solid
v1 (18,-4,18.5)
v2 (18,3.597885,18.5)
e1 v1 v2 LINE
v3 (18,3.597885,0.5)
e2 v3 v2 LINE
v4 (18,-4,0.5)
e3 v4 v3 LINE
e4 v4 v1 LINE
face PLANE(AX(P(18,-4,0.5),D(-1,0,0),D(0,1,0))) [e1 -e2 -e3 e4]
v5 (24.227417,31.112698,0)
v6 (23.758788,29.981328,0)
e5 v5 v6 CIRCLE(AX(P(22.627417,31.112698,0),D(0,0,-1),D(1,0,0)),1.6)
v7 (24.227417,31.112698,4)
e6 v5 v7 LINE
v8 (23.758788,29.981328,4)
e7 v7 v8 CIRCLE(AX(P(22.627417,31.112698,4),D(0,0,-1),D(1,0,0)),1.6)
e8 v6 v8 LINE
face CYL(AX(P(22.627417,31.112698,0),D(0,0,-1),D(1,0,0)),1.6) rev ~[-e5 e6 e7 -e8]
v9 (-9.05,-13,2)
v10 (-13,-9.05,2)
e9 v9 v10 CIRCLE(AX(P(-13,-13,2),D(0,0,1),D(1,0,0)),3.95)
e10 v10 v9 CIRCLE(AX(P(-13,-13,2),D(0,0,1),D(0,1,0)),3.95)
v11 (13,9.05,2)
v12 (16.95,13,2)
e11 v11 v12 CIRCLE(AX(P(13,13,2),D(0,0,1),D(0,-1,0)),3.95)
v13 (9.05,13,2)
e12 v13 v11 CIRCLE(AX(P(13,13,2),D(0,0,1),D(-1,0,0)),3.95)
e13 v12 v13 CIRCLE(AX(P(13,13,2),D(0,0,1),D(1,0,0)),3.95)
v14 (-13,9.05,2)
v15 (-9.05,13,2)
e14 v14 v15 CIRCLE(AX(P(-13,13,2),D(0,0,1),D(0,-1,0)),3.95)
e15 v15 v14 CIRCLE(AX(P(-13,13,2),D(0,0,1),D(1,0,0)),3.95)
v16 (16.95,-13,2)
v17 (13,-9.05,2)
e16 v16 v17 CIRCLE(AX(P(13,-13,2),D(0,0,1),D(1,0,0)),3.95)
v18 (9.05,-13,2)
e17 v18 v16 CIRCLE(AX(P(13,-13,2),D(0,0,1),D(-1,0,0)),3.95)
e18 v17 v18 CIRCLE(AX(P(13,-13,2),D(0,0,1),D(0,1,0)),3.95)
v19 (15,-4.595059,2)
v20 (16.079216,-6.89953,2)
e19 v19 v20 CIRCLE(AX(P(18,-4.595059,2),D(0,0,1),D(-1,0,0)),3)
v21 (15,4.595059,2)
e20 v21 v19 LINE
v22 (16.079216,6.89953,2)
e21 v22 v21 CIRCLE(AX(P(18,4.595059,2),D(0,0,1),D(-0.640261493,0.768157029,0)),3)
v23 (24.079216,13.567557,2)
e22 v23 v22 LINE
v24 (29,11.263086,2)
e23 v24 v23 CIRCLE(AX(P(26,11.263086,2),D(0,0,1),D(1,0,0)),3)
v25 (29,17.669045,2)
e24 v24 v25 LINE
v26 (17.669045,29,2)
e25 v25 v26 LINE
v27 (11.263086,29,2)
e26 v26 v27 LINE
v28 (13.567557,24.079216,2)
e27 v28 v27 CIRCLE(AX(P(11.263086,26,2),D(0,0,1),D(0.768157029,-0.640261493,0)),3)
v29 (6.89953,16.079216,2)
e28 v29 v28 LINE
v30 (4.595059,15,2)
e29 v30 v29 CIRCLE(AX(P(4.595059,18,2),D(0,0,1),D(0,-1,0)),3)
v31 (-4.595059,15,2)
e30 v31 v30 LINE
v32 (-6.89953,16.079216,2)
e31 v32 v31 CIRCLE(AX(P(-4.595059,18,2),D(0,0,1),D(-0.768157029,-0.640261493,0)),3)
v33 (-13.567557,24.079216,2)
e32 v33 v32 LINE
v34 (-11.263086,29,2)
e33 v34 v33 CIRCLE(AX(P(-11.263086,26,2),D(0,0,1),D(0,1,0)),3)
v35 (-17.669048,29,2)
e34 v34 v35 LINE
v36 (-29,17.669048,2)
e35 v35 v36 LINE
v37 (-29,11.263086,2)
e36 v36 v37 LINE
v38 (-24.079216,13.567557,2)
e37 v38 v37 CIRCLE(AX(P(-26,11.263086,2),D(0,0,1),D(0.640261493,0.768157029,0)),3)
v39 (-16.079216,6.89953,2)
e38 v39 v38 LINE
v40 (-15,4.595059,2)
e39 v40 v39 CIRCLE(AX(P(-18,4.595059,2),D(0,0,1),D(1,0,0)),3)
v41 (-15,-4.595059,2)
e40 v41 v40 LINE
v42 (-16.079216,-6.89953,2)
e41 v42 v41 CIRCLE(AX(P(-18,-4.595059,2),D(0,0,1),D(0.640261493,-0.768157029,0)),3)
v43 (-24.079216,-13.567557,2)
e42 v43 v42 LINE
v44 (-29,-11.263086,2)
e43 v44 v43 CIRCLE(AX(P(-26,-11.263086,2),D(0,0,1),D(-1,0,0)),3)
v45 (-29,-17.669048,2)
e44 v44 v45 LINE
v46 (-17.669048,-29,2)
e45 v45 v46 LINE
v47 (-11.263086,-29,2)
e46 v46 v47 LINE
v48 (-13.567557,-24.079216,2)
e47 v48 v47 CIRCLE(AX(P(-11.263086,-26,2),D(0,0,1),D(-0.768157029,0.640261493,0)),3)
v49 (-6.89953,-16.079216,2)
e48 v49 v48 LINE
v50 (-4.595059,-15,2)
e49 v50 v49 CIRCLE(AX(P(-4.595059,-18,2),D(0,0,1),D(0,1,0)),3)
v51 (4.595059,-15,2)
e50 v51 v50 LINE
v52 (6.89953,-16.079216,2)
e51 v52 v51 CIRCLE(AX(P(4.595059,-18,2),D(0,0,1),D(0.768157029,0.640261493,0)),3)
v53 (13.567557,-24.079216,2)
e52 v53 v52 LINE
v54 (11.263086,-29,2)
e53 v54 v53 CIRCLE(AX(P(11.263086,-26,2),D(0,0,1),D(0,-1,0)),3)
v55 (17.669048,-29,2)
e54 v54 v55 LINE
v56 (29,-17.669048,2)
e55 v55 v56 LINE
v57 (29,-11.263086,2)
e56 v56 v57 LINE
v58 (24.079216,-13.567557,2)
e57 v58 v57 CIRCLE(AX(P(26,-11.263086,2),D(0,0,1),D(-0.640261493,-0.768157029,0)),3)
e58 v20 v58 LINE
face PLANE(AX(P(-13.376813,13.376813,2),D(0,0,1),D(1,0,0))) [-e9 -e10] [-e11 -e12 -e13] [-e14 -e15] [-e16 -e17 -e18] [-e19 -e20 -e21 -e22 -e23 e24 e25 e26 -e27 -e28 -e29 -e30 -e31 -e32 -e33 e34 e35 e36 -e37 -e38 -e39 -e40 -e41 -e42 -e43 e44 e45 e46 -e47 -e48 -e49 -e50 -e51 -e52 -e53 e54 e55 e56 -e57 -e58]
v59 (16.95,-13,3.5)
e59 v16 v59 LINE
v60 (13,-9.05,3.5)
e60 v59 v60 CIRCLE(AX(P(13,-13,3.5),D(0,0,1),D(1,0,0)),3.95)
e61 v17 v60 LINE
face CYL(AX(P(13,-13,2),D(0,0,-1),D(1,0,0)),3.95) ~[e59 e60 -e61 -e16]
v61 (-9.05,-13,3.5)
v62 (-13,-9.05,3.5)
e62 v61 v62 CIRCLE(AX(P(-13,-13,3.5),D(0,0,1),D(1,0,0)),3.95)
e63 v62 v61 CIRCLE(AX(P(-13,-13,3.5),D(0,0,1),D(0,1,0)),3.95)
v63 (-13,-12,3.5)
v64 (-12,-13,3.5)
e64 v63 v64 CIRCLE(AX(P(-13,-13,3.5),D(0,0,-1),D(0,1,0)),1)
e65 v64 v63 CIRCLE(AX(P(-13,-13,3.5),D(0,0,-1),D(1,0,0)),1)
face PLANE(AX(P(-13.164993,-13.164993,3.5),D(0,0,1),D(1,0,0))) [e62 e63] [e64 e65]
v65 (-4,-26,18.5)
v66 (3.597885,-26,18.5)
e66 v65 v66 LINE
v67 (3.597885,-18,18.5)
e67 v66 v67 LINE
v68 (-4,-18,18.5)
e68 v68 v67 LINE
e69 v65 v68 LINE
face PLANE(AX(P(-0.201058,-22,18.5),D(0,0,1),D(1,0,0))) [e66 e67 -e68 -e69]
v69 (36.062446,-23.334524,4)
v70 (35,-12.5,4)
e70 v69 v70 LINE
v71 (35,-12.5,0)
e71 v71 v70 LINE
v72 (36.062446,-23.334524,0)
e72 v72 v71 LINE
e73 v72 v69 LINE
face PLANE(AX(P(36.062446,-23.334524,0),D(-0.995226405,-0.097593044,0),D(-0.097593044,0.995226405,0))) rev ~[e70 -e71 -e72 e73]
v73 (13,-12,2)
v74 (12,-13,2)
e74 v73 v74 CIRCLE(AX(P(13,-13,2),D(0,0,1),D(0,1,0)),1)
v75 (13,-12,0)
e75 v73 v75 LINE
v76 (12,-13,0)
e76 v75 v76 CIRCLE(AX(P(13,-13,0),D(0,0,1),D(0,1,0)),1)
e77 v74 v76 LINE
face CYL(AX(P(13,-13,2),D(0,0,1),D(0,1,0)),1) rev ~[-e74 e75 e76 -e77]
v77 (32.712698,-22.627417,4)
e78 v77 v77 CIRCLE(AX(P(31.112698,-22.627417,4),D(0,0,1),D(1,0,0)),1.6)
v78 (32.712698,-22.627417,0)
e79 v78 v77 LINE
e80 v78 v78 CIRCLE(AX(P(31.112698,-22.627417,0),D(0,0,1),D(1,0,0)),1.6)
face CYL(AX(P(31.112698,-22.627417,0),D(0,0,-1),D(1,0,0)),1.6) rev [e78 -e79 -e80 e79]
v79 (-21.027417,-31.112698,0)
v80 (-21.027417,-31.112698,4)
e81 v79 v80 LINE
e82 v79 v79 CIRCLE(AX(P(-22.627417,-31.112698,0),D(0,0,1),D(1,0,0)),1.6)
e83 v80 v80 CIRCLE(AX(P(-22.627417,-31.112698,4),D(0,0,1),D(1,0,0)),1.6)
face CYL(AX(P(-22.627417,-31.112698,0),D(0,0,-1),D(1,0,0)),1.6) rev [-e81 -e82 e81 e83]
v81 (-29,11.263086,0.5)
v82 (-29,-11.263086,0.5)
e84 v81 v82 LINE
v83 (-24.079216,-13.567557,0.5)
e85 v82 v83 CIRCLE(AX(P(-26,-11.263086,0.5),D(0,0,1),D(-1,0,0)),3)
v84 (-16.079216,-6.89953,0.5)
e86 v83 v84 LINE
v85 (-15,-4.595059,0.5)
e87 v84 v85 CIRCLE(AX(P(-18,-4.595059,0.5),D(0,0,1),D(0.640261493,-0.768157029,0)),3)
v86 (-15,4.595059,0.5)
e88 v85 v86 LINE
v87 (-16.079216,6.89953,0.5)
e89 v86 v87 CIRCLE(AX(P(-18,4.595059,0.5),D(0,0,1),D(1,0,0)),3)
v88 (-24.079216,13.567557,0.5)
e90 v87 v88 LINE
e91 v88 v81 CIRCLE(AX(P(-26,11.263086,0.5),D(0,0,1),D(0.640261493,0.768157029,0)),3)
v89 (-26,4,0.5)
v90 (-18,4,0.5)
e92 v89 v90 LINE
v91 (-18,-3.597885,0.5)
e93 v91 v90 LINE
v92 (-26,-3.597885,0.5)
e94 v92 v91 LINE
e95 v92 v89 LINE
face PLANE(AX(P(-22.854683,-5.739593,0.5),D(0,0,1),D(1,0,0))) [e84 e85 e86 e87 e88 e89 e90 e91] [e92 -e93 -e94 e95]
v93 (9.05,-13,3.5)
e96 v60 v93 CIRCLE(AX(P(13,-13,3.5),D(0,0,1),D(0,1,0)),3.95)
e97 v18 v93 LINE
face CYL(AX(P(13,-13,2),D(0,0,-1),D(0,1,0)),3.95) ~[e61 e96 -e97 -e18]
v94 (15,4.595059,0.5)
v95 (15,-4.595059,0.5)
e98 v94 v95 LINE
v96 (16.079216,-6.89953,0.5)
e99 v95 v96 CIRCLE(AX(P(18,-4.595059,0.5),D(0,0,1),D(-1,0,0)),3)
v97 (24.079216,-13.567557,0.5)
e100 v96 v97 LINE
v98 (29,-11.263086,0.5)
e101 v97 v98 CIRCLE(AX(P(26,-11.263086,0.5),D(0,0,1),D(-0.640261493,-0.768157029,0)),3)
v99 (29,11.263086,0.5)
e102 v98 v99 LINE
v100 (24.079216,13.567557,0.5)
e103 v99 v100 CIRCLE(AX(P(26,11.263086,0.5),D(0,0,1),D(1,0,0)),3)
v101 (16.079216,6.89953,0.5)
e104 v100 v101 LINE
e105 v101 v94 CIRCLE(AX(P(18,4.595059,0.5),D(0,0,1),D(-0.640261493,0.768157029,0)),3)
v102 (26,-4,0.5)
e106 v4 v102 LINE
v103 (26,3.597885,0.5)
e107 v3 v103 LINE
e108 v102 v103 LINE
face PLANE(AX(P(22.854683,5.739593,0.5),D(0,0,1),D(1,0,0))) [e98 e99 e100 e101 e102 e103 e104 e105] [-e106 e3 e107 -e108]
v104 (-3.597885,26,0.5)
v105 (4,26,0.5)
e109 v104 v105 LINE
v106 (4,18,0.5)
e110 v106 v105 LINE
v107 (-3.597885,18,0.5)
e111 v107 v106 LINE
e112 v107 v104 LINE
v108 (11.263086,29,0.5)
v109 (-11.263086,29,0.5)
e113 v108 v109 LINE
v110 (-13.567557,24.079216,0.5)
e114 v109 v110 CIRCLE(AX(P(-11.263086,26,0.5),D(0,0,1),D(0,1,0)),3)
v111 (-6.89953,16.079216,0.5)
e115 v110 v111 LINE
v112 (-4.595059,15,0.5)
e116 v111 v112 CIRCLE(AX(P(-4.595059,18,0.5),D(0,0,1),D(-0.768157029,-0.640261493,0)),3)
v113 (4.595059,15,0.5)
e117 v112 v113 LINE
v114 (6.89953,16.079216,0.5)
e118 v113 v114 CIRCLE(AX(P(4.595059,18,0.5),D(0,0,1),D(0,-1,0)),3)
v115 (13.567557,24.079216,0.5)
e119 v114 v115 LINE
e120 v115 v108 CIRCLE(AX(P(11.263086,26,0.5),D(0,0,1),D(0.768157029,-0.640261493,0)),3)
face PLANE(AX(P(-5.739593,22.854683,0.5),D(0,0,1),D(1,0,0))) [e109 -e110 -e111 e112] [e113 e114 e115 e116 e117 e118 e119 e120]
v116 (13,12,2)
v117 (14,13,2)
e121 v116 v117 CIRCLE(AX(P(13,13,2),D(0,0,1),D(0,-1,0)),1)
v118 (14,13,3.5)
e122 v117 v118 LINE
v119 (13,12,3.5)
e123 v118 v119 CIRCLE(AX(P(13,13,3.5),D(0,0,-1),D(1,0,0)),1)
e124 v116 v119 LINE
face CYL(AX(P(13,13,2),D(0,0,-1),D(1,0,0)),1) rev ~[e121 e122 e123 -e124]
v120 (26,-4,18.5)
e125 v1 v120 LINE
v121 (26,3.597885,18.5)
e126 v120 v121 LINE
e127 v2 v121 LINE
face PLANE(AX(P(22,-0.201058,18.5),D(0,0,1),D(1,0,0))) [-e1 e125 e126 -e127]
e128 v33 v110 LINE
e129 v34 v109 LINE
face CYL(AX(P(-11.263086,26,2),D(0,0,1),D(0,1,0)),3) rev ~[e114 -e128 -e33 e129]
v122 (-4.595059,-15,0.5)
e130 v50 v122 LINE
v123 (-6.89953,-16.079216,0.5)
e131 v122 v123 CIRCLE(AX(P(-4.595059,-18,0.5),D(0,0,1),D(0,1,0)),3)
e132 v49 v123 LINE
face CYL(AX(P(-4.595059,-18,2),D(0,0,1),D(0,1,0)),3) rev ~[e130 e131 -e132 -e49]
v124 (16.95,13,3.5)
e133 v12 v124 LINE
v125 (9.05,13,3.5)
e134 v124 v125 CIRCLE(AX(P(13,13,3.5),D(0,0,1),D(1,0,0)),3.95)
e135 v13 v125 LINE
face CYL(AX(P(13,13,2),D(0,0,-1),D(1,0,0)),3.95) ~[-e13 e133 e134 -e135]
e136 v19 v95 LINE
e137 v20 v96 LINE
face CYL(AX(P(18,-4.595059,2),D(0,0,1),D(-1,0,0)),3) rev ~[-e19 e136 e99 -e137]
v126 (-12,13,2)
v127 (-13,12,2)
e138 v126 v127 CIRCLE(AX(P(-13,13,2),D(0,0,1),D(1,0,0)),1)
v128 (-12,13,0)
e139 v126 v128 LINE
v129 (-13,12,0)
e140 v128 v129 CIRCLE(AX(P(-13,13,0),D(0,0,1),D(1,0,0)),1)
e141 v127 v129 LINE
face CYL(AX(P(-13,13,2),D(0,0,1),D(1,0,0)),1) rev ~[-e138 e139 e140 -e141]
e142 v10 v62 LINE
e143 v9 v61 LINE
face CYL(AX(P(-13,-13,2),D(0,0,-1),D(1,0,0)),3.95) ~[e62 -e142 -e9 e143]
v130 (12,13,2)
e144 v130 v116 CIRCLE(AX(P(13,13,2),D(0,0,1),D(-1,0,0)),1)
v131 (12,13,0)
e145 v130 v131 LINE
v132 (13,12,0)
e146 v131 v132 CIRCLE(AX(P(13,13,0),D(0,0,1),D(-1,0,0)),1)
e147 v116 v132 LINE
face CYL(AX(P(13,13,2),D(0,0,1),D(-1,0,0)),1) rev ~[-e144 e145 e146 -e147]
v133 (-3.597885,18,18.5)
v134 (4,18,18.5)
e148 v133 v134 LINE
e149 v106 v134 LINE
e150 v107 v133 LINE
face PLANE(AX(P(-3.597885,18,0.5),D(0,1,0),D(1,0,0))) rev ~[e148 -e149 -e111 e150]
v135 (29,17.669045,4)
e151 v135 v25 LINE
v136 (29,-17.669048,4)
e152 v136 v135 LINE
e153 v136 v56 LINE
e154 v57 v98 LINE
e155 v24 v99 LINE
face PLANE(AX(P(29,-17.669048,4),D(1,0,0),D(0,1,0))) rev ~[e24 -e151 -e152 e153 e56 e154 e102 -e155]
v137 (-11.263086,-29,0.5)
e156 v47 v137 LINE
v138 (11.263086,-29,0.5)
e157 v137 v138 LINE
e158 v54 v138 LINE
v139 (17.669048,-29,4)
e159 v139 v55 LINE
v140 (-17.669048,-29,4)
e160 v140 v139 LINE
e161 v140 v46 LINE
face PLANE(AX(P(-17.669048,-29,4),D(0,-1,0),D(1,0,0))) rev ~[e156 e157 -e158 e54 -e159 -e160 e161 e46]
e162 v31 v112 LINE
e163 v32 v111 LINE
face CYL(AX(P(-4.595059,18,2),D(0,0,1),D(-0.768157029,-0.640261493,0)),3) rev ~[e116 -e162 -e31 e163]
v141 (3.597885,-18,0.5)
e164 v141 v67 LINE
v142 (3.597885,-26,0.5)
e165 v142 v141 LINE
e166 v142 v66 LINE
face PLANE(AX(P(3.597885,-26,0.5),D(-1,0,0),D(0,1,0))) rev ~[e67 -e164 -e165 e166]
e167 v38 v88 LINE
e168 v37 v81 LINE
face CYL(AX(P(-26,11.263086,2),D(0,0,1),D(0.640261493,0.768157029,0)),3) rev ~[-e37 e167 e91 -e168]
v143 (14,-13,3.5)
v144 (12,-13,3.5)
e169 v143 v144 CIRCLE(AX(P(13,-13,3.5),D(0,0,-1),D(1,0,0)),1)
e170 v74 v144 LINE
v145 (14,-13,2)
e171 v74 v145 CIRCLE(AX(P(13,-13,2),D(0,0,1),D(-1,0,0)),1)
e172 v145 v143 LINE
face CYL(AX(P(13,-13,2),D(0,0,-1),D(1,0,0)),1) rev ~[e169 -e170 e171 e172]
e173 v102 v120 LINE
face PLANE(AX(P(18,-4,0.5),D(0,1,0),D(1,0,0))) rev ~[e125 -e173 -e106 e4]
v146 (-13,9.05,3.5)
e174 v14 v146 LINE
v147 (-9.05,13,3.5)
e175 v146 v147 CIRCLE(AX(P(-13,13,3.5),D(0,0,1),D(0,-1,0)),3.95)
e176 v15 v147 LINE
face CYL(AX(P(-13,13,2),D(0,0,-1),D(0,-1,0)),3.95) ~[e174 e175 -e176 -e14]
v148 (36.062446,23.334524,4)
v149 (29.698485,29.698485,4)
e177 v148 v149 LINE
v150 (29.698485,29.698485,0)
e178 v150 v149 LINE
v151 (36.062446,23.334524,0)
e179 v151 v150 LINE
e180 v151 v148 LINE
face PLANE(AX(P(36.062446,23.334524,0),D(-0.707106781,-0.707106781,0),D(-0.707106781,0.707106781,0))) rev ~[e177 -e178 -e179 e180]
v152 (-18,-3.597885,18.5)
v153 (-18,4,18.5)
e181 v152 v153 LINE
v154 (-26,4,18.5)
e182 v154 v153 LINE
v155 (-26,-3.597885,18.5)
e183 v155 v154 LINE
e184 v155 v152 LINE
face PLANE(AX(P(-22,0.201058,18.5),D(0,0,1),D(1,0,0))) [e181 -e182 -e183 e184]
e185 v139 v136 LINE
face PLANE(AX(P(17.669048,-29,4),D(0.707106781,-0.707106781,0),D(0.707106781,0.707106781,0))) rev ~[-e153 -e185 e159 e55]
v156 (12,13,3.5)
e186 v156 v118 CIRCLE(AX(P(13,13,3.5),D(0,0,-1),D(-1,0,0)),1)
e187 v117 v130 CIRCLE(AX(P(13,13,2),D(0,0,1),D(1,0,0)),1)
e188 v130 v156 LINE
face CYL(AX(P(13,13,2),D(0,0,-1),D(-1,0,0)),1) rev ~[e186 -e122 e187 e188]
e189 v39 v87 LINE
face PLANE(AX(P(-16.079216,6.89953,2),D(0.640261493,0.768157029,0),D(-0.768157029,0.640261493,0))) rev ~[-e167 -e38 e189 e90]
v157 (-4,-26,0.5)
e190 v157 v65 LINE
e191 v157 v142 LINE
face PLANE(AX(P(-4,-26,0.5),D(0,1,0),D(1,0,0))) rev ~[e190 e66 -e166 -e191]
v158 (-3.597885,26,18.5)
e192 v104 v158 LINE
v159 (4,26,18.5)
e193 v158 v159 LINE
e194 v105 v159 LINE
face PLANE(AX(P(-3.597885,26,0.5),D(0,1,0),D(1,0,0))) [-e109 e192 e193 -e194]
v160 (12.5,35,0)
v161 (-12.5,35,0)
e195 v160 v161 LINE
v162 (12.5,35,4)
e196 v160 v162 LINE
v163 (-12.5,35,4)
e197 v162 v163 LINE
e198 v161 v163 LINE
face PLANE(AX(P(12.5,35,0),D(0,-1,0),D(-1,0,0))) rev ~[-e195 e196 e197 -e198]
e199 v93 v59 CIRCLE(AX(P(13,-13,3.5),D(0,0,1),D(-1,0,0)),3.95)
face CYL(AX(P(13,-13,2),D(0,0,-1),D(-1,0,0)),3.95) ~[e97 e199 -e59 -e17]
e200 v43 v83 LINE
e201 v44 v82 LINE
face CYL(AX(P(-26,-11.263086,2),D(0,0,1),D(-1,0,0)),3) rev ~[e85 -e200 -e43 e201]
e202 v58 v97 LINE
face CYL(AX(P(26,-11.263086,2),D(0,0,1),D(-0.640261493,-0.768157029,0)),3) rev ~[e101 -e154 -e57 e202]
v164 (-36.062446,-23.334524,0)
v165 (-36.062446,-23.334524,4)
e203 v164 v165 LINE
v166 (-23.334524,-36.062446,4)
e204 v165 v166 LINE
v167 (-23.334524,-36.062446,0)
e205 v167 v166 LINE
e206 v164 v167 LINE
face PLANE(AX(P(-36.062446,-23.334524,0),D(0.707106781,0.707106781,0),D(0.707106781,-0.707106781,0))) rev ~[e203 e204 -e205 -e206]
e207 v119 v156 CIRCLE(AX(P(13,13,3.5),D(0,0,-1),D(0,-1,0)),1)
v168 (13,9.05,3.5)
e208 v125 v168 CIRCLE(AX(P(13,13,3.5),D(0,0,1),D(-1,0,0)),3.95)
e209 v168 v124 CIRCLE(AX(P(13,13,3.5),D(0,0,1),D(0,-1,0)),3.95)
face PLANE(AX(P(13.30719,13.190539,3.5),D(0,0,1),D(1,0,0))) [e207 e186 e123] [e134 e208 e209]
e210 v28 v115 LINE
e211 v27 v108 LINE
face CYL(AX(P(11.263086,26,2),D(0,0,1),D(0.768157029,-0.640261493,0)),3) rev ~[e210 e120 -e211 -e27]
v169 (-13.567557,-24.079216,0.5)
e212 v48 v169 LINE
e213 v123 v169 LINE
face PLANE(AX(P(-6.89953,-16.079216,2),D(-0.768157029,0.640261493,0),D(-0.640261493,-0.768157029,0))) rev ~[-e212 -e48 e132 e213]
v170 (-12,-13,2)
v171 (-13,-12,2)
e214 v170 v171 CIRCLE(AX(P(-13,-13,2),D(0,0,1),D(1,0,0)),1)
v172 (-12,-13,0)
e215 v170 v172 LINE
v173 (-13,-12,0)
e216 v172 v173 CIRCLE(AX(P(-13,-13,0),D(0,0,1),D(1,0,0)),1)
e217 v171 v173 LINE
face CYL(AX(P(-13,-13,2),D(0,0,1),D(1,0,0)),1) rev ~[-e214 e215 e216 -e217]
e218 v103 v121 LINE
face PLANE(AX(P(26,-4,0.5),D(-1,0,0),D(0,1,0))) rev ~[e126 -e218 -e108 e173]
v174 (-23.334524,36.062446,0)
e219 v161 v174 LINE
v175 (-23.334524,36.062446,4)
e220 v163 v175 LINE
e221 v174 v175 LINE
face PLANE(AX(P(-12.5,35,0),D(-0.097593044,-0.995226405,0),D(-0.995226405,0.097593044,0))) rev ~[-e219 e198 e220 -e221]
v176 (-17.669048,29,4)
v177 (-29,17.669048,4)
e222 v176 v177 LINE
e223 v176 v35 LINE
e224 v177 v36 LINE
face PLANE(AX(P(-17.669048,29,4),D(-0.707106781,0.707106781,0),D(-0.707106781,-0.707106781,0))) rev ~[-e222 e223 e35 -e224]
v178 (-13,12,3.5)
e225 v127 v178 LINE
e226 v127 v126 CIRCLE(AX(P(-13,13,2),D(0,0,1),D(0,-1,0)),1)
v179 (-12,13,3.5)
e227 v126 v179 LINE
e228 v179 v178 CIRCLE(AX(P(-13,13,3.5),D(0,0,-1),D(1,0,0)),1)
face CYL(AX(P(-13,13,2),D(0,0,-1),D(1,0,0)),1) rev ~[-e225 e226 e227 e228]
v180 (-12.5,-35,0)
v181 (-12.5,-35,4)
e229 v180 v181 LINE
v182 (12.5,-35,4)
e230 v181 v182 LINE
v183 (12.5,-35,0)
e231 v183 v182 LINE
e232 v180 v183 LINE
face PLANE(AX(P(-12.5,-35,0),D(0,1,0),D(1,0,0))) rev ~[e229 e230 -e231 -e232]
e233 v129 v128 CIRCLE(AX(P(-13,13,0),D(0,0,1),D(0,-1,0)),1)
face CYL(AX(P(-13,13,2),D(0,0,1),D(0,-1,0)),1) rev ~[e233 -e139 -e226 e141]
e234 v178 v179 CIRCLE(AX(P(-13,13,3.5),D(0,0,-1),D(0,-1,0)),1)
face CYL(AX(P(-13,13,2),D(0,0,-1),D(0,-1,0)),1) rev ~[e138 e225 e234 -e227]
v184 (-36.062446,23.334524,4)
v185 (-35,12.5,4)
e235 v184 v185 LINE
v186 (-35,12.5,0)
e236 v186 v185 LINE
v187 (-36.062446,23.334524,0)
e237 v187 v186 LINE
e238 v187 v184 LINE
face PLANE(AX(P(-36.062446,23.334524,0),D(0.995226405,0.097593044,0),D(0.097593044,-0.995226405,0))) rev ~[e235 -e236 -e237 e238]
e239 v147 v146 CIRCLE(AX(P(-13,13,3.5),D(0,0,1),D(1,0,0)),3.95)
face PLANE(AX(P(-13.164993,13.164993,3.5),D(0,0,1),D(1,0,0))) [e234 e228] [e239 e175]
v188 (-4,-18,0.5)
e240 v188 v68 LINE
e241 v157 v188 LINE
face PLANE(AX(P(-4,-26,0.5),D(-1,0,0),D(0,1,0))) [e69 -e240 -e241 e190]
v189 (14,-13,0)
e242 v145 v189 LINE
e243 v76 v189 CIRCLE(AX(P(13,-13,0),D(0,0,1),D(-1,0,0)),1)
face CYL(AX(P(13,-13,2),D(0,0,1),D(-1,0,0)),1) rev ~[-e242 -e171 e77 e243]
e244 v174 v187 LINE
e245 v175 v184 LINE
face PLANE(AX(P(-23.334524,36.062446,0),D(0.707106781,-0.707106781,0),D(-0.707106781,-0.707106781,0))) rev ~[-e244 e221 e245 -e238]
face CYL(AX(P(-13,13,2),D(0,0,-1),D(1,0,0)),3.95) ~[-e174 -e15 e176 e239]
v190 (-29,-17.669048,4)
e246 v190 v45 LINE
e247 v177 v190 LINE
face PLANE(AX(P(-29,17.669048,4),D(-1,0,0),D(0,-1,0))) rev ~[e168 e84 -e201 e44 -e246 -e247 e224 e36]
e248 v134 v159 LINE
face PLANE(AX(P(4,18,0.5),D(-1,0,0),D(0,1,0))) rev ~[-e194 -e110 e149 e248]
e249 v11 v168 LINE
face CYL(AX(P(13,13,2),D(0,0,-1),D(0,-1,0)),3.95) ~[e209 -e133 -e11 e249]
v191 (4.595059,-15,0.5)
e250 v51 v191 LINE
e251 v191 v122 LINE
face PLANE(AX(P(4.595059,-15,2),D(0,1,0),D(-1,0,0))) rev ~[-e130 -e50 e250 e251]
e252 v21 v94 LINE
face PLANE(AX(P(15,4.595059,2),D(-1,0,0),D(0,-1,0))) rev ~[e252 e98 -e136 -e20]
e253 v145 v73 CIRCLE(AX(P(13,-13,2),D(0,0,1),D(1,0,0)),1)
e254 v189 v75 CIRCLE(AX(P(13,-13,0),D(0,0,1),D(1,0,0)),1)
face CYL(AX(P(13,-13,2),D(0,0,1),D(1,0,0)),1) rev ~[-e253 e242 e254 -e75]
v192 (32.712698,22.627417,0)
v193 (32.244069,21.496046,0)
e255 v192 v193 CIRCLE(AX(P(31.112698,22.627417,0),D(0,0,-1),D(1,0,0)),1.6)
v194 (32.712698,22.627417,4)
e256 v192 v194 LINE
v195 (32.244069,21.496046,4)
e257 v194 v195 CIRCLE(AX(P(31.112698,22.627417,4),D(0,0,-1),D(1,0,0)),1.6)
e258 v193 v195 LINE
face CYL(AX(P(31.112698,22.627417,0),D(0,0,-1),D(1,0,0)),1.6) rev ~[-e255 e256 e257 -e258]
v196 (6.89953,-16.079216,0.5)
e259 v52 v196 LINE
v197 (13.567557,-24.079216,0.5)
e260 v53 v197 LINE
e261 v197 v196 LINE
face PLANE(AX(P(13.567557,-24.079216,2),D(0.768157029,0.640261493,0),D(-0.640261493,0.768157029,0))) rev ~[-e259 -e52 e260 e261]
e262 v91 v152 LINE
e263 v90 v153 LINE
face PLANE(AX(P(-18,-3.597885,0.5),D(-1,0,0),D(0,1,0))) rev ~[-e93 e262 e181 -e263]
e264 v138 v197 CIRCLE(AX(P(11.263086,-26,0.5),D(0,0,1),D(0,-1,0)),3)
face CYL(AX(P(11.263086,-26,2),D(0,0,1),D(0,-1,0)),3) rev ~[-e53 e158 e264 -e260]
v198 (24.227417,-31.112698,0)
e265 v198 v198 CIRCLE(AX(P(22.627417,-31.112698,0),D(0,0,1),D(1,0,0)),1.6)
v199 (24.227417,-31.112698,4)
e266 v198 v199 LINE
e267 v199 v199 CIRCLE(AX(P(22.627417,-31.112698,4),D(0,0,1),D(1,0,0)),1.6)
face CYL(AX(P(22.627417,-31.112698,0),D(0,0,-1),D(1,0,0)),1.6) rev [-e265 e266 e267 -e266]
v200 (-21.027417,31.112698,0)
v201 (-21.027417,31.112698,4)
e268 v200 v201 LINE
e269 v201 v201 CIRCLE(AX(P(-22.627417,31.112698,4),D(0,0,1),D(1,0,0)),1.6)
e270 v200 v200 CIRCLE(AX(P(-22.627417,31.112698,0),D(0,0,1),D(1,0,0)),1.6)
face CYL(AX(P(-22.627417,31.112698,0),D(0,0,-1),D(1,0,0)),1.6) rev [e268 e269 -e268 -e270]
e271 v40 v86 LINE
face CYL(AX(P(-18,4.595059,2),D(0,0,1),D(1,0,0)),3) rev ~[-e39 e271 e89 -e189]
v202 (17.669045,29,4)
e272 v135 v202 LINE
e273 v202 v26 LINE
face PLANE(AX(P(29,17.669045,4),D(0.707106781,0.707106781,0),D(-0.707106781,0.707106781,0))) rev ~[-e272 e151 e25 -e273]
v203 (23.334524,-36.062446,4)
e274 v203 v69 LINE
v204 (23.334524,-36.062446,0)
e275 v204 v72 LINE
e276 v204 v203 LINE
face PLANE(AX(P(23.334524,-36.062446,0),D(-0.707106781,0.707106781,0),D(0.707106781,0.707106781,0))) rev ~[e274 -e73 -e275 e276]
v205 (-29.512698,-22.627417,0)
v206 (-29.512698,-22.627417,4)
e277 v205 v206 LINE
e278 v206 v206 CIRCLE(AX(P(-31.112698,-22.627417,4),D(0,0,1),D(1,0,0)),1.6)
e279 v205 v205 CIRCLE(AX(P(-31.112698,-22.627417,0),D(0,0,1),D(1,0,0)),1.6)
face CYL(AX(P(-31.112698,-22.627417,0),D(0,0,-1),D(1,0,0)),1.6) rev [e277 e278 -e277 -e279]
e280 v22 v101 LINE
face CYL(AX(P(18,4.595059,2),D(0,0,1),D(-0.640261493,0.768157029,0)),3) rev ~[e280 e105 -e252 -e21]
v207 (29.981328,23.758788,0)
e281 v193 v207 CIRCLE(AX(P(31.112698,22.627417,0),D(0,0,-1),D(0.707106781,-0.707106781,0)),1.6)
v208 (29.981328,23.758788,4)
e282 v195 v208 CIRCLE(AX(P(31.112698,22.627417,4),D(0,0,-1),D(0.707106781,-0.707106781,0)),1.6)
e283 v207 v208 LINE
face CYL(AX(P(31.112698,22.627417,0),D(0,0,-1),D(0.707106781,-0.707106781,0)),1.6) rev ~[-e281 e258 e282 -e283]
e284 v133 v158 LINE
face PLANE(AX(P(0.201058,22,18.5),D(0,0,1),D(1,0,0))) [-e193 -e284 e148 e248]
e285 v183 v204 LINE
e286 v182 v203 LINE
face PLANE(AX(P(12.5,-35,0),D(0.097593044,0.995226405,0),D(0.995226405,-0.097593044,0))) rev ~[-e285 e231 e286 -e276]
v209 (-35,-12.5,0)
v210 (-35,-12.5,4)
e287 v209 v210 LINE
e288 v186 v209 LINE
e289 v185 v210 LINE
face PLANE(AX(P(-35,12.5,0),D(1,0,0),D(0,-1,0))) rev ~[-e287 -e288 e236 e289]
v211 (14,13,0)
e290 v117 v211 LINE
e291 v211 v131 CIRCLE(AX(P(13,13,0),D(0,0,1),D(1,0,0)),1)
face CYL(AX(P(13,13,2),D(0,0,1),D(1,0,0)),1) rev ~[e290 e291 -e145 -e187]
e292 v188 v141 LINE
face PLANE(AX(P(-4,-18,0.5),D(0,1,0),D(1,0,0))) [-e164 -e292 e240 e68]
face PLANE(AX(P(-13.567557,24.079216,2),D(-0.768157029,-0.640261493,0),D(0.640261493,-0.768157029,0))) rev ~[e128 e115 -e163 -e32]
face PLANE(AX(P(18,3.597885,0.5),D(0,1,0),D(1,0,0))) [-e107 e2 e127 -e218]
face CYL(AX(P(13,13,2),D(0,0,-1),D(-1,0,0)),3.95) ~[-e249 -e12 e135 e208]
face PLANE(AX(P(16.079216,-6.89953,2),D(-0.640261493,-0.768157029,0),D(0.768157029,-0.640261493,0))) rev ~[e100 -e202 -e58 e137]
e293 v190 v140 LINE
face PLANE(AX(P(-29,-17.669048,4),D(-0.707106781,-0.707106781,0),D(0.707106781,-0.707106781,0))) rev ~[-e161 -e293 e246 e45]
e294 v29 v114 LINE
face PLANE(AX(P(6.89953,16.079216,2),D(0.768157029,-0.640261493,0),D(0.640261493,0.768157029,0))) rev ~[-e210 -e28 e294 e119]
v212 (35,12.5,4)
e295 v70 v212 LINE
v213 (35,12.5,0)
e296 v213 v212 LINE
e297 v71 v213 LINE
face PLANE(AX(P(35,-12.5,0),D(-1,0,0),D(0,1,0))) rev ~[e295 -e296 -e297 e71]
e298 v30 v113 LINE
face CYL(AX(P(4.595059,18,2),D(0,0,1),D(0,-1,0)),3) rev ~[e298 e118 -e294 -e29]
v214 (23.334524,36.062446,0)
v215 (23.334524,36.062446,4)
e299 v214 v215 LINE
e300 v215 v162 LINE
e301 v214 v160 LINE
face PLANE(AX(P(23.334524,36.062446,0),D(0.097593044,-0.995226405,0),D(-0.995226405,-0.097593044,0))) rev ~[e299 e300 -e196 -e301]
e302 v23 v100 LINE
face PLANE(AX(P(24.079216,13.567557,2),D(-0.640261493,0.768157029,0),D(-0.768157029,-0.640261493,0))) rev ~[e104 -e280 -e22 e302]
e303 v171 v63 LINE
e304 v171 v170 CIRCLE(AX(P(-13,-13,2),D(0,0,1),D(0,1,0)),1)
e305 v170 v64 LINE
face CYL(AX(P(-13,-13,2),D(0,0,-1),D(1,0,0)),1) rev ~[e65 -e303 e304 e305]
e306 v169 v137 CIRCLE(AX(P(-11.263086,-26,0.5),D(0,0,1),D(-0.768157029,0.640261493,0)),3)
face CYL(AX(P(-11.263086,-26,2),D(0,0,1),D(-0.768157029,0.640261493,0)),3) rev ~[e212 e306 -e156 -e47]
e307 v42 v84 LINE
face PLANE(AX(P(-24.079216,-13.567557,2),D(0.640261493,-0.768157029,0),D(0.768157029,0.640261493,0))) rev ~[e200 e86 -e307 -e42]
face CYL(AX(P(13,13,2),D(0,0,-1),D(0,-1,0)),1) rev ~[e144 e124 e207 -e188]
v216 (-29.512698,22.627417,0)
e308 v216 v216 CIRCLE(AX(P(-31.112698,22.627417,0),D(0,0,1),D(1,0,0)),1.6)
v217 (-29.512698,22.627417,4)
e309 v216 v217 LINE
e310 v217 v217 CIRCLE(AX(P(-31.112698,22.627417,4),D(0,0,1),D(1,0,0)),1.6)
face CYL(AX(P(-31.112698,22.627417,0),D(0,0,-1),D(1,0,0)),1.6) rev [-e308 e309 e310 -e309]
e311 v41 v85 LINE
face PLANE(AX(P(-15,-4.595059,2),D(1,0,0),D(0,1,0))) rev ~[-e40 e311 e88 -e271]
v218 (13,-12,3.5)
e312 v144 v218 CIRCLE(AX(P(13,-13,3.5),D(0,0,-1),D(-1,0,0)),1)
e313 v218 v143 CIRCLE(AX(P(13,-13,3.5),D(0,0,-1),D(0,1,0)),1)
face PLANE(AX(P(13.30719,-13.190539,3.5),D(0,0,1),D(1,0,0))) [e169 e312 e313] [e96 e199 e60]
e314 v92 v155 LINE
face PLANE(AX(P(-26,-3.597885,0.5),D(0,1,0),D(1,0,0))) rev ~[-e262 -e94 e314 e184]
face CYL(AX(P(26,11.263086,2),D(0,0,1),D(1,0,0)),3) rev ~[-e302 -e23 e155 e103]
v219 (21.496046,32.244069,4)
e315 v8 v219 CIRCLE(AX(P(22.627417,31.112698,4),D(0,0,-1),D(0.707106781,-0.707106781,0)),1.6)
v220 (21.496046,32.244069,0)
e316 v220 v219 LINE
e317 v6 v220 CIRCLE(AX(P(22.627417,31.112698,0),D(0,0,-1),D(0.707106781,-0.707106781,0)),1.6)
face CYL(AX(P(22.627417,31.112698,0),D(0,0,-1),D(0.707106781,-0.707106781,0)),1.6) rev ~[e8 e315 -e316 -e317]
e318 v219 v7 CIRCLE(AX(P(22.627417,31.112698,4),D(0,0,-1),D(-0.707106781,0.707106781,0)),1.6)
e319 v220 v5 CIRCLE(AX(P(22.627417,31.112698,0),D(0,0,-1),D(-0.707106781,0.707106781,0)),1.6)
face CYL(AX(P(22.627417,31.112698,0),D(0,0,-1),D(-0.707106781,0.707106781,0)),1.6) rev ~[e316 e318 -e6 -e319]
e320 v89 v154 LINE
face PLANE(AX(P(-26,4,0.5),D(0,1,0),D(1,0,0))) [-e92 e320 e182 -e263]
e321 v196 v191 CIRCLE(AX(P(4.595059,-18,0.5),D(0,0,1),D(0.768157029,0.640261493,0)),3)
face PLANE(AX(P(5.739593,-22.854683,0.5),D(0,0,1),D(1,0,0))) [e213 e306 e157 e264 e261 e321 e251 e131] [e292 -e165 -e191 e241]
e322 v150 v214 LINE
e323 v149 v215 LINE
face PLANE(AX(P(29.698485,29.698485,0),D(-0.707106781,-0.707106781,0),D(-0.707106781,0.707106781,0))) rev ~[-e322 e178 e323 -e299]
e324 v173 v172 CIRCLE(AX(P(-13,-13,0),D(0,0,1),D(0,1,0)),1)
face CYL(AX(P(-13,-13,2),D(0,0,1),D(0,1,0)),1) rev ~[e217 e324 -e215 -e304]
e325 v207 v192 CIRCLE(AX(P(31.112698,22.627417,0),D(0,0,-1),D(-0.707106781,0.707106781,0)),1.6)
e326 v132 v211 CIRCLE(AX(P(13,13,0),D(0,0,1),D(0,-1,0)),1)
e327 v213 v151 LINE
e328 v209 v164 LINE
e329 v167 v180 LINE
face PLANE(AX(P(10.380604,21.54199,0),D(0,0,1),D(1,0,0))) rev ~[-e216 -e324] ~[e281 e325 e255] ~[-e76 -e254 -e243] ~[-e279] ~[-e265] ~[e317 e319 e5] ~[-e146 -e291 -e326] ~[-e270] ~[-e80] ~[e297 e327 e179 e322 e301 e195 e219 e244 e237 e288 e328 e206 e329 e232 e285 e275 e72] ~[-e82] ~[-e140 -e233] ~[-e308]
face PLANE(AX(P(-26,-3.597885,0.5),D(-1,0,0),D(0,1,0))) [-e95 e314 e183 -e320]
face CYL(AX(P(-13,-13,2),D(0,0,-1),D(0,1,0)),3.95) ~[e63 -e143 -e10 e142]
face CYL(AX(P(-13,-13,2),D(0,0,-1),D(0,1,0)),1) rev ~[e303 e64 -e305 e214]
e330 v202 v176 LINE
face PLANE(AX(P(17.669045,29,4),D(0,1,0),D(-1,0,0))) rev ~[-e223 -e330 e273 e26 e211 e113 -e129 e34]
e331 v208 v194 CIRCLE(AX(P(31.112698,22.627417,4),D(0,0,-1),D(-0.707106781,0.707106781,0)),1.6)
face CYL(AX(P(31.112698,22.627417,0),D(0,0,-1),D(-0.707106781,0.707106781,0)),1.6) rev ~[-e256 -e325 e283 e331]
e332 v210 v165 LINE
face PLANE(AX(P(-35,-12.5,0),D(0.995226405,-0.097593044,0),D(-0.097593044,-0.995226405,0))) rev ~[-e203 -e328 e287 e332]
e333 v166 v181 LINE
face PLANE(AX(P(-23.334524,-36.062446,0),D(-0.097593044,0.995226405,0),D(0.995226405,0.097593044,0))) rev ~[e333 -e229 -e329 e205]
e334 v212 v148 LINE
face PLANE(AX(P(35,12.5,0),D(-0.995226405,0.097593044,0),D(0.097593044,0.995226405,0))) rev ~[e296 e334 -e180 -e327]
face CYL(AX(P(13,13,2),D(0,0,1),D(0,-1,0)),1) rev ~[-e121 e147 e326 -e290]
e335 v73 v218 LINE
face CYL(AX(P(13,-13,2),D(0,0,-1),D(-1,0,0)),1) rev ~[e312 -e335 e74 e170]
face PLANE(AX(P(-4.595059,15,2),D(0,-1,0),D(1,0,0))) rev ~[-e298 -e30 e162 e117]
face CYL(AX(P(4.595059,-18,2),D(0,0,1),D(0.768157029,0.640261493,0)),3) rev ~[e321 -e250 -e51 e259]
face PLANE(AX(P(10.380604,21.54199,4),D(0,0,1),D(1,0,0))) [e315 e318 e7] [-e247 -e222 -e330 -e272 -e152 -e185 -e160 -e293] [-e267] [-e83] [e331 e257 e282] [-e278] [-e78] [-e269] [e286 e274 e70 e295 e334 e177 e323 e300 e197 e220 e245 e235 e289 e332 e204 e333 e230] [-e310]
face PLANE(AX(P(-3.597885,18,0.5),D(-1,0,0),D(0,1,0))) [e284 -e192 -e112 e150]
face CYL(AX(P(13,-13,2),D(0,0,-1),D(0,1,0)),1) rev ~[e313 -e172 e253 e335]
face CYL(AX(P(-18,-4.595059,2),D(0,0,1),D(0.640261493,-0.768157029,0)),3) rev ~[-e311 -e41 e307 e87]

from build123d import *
from build123d import SkipClean  # not in build123d's __all__

# Parameters (mm, degrees)
F0_R      = 1.6
F1_DEPTH  = 4
F3_DEPTH  = 2
F5_DEPTH  = 1.5
F7_DEPTH  = 2.001
F8_DEPTH  = 25
F9_DEPTH  = 25
F10_DEPTH = 1.5
F11_W     = 8
F11_H     = 7.5978846649
F11_W_2   = 7.5978846649
F11_H_2   = 8
F12_DEPTH = 18


# Not quite as in the source:
# - after a boolean that leaves OpenCascade's solid faulty, fix() repairs it


with BuildPart() as f1:
    # F0 (on Top) → F1 (new body)
    with BuildSketch(Plane.XY):
        Polygon((0, 35), (0, 0), (26.8700576851, 26.8700576851), (29.6984848098, 29.6984848098), (23.3345237792, 36.0624458405), (12.5, 35), align=None)
        with BuildLine():
            ThreePointArc((24.227416998, 31.1126983722), (24.10562425, 30.5004048804), (23.7587878479, 29.9813275223))
            ThreePointArc((23.7587878479, 29.9813275223), (21.4960461481, 29.9813275223), (21.4960461481, 32.2440692221))
            ThreePointArc((21.4960461481, 32.2440692221), (23.2397104898, 32.5909056242), (24.227416998, 31.1126983722))
        make_face(mode=Mode.SUBTRACT)
        Polygon((0, -35), (0, 0), (0, 35), (-12.5, 35), (-23.3345237792, 36.0624458405), (-36.0624458405, 23.3345237792), (-35, 12.5), (-35, -12.5), (-36.0624458405, -23.3345237792), (-23.3345237792, -36.0624458405), (-12.5, -35), align=None)
        with Locations((-22.627416998, -31.1126983722)):
            Circle(F0_R, mode=Mode.SUBTRACT)
        with Locations((-31.1126983722, -22.627416998)):
            Circle(F0_R, mode=Mode.SUBTRACT)
        with Locations((-31.1126983722, 22.627416998)):
            Circle(F0_R, mode=Mode.SUBTRACT)
        with Locations((-22.627416998, 31.1126983722)):
            Circle(F0_R, mode=Mode.SUBTRACT)
        Polygon((26.8700576851, 26.8700576851), (0, 0), (0, -35), (12.5, -35), (23.3345237792, -36.0624458405), (36.0624458405, -23.3345237792), (35, -12.5), (35, 12.5), (36.0624458405, 23.3345237792), (29.6984848098, 29.6984848098), align=None)
        with Locations((22.627416998, -31.1126983722)):
            Circle(F0_R, mode=Mode.SUBTRACT)
        with Locations((31.1126983722, -22.627416998)):
            Circle(F0_R, mode=Mode.SUBTRACT)
        with BuildLine():
            ThreePointArc((32.2440692221, 21.4960461481), (29.9813275223, 21.4960461481), (29.9813275223, 23.7587878479))
            ThreePointArc((29.9813275223, 23.7587878479), (31.724991864, 24.10562425), (32.7126983722, 22.627416998))
            ThreePointArc((32.7126983722, 22.627416998), (32.5909056242, 22.0151235062), (32.2440692221, 21.4960461481))
        make_face(mode=Mode.SUBTRACT)
    extrude(amount=F1_DEPTH)

    # F2 (on face) → F3 (cut)
    with BuildSketch(Plane.XY.offset(4)):
        Polygon((-29, 17.6690475583), (-29, 0), (0, 0), (0, 29), (-17.6690475583, 29), align=None)
        Polygon((0, 0), (-29, 0), (-29, -17.6690475583), (-17.6690475583, -29), (17.6690475583, -29), (29, -17.6690475583), (29, 17.6690451666), (17.6690451666, 29), (0, 29), align=None)
    extrude(amount=-F3_DEPTH, mode=Mode.SUBTRACT)

    # F4 (on face) → F5 (cut)
    with BuildSketch(Plane.XY.offset(2)):
        with BuildLine():
            Line((-15, -4.5950587171), (-15, 0))
            Line((-15, 0), (-29, 0))
            Line((-29, 0), (-29, -11.2630858933))
            ThreePointArc((-29, -11.2630858933), (-27.2723298637, -13.979918004), (-24.0792155214, -13.5675569794))
            Line((-24.0792155214, -13.5675569794), (-16.0792155214, -6.8995298032))
            ThreePointArc((-16.0792155214, -6.8995298032), (-15.2831678893, -5.8673885808), (-15, -4.5950587171))
        make_face()
        with BuildLine():
            Line((-29, 0), (-15, 0))
            Line((-15, 0), (-15, 4.5950587171))
            ThreePointArc((-15, 4.5950587171), (-15.2831678893, 5.8673885808), (-16.0792155214, 6.8995298032))
            Line((-16.0792155214, 6.8995298032), (-24.0792155214, 13.5675569794))
            ThreePointArc((-24.0792155214, 13.5675569794), (-27.2723298637, 13.979918004), (-29, 11.2630858933))
            Line((-29, 11.2630858933), (-29, 0))
        make_face()
        with BuildLine():
            Line((0, 15), (0, 29))
            Line((0, 29), (-11.2630858933, 29))
            ThreePointArc((-11.2630858933, 29), (-13.979918004, 27.2723298637), (-13.5675569794, 24.0792155214))
            Line((-13.5675569794, 24.0792155214), (-6.8995298032, 16.0792155214))
            ThreePointArc((-6.8995298032, 16.0792155214), (-5.8673885808, 15.2831678893), (-4.5950587171, 15))
            Line((-4.5950587171, 15), (0, 15))
        make_face()
        with BuildLine():
            Line((11.2630858933, 29), (0, 29))
            Line((0, 29), (0, 15))
            Line((0, 15), (4.5950587171, 15))
            ThreePointArc((4.5950587171, 15), (5.8673885808, 15.2831678893), (6.8995298032, 16.0792155214))
            Line((6.8995298032, 16.0792155214), (13.5675569794, 24.0792155214))
            ThreePointArc((13.5675569794, 24.0792155214), (13.979918004, 27.2723298637), (11.2630858933, 29))
        make_face()
        with BuildLine():
            Line((15, 4.5950587171), (15, 0))
            Line((15, 0), (29, 0))
            Line((29, 0), (29, 11.2630858933))
            ThreePointArc((29, 11.2630858933), (27.2723298637, 13.979918004), (24.0792155214, 13.5675569794))
            Line((24.0792155214, 13.5675569794), (16.0792155214, 6.8995298032))
            ThreePointArc((16.0792155214, 6.8995298032), (15.2831678893, 5.8673885808), (15, 4.5950587171))
        make_face()
        with BuildLine():
            Line((29, 0), (15, 0))
            Line((15, 0), (15, -4.5950587171))
            ThreePointArc((15, -4.5950587171), (15.2831678893, -5.8673885808), (16.0792155214, -6.8995298032))
            Line((16.0792155214, -6.8995298032), (24.0792155214, -13.5675569794))
            ThreePointArc((24.0792155214, -13.5675569794), (27.2723298637, -13.979918004), (29, -11.2630858933))
            Line((29, -11.2630858933), (29, 0))
        make_face()
        with BuildLine():
            Line((4.5950587171, -15), (0, -15))
            Line((0, -15), (0, -29))
            Line((0, -29), (11.2630858933, -29))
            ThreePointArc((11.2630858933, -29), (13.979918004, -27.2723298637), (13.5675569794, -24.0792155214))
            Line((13.5675569794, -24.0792155214), (6.8995298032, -16.0792155214))
            ThreePointArc((6.8995298032, -16.0792155214), (5.8673885808, -15.2831678893), (4.5950587171, -15))
        make_face()
        with BuildLine():
            Line((0, -29), (0, -15))
            Line((0, -15), (-4.5950587171, -15))
            ThreePointArc((-4.5950587171, -15), (-5.8673885808, -15.2831678893), (-6.8995298032, -16.0792155214))
            Line((-6.8995298032, -16.0792155214), (-13.5675569794, -24.0792155214))
            ThreePointArc((-13.5675569794, -24.0792155214), (-13.979918004, -27.2723298637), (-11.2630858933, -29))
            Line((-11.2630858933, -29), (0, -29))
        make_face()
    extrude(amount=-F5_DEPTH, mode=Mode.SUBTRACT)

    # F6 (on face) → F7 (cut, through all)
    with BuildSketch(Plane.XY.offset(2)):
        with BuildLine():
            Line((13, 13), (13, 12))
            ThreePointArc((13, 12), (13.7071067812, 12.2928932188), (14, 13))
            ThreePointArc((14, 13), (13, 14), (12, 13))
            Line((12, 13), (13, 13))
        make_face()
        with BuildLine():
            ThreePointArc((12, 13), (12.2928932188, 12.2928932188), (13, 12))
            Line((13, 12), (13, 13))
            Line((13, 13), (12, 13))
        make_face()
    extrude(amount=-F7_DEPTH, mode=Mode.SUBTRACT)

    # F6 (on face) → F8 (cut)
    with BuildSketch(Plane.XY.offset(2)):
        with BuildLine():
            Line((0, 13), (0, 0))
            Line((0, 0), (13, 0))
            Line((13, 0), (13, 9.05))
            ThreePointArc((13, 9.05), (10.2069282143, 10.2069282143), (9.05, 13))
            Line((9.05, 13), (0, 13))
        make_face()
        with BuildLine():
            Line((-13, 0), (0, 0))
            Line((0, 0), (0, 13))
            Line((0, 13), (-9.05, 13))
            ThreePointArc((-9.05, 13), (-10.2069282143, 10.2069282143), (-13, 9.05))
            Line((-13, 9.05), (-13, 0))
        make_face()
        with BuildLine():
            Line((13, 0), (0, 0))
            Line((0, 0), (0, -13))
            Line((0, -13), (9.05, -13))
            ThreePointArc((9.05, -13), (10.2069282143, -10.2069282143), (13, -9.05))
            Line((13, -9.05), (13, 0))
        make_face()
        with BuildLine():
            Line((0, -13), (0, 0))
            Line((0, 0), (-13, 0))
            Line((-13, 0), (-13, -9.05))
            ThreePointArc((-13, -9.05), (-10.2069282143, -10.2069282143), (-9.05, -13))
            Line((-9.05, -13), (0, -13))
        make_face()
        with BuildLine():
            ThreePointArc((9.05, 13), (10.2069282143, 10.2069282143), (13, 9.05))
            Line((13, 9.05), (13, 12))
            ThreePointArc((13, 12), (12.2928932188, 12.2928932188), (12, 13))
            Line((12, 13), (9.05, 13))
        make_face()
        with BuildLine():
            Line((13, 12), (13, 9.05))
            ThreePointArc((13, 9.05), (15.7930717857, 10.2069282143), (16.95, 13))
            ThreePointArc((16.95, 13), (13, 16.95), (9.05, 13))
            Line((9.05, 13), (12, 13))
            ThreePointArc((12, 13), (13, 14), (14, 13))
            ThreePointArc((14, 13), (13.7071067812, 12.2928932188), (13, 12))
        make_face()
        with BuildLine():
            ThreePointArc((16.95, -13), (15.7930717857, -10.2069282143), (13, -9.05))
            Line((13, -9.05), (13, -12))
            ThreePointArc((13, -12), (13.7071067812, -12.2928932188), (14, -13))
            ThreePointArc((14, -13), (13, -14), (12, -13))
            Line((12, -13), (9.05, -13))
            ThreePointArc((9.05, -13), (13, -16.95), (16.95, -13))
        make_face()
        with BuildLine():
            Line((13, -12), (13, -9.05))
            ThreePointArc((13, -9.05), (10.2069282143, -10.2069282143), (9.05, -13))
            Line((9.05, -13), (12, -13))
            ThreePointArc((12, -13), (12.2928932188, -12.2928932188), (13, -12))
        make_face()
        with BuildLine():
            ThreePointArc((-13, 9.05), (-10.2069282143, 10.2069282143), (-9.05, 13))
            Line((-9.05, 13), (-12, 13))
            ThreePointArc((-12, 13), (-12.2928932188, 12.2928932188), (-13, 12))
            Line((-13, 12), (-13, 9.05))
        make_face()
        with BuildLine():
            Line((-12, 13), (-9.05, 13))
            ThreePointArc((-9.05, 13), (-15.7930717857, 15.7930717857), (-13, 9.05))
            Line((-13, 9.05), (-13, 12))
            ThreePointArc((-13, 12), (-13.7071067812, 13.7071067812), (-12, 13))
        make_face()
        with BuildLine():
            ThreePointArc((-13, -9.05), (-15.7930717857, -15.7930717857), (-9.05, -13))
            Line((-9.05, -13), (-12, -13))
            ThreePointArc((-12, -13), (-13.7071067812, -13.7071067812), (-13, -12))
            Line((-13, -12), (-13, -9.05))
        make_face()
        with BuildLine():
            Line((-12, -13), (-9.05, -13))
            ThreePointArc((-9.05, -13), (-10.2069282143, -10.2069282143), (-13, -9.05))
            Line((-13, -9.05), (-13, -12))
            ThreePointArc((-13, -12), (-12.2928932188, -12.2928932188), (-12, -13))
        make_face()
    extrude(amount=F8_DEPTH, mode=Mode.SUBTRACT)

    # F6 (on face) → F9 (cut)
    with BuildSketch(Plane.XY.offset(2)):
        with BuildLine():
            Line((-13, 13), (-12, 13))
            ThreePointArc((-12, 13), (-13.7071067812, 13.7071067812), (-13, 12))
            Line((-13, 12), (-13, 13))
        make_face()
        with BuildLine():
            ThreePointArc((-13, 12), (-12.2928932188, 12.2928932188), (-12, 13))
            Line((-12, 13), (-13, 13))
            Line((-13, 13), (-13, 12))
        make_face()
        with BuildLine():
            ThreePointArc((-13, -12), (-13.7071067812, -13.7071067812), (-12, -13))
            Line((-12, -13), (-13, -13))
            Line((-13, -13), (-13, -12))
        make_face()
        with BuildLine():
            Line((-13, -13), (-12, -13))
            ThreePointArc((-12, -13), (-12.2928932188, -12.2928932188), (-13, -12))
            Line((-13, -12), (-13, -13))
        make_face()
        with BuildLine():
            ThreePointArc((14, -13), (13.7071067812, -12.2928932188), (13, -12))
            Line((13, -12), (13, -13))
            Line((13, -13), (12, -13))
            ThreePointArc((12, -13), (13, -14), (14, -13))
        make_face()
        with BuildLine():
            Line((13, -13), (13, -12))
            ThreePointArc((13, -12), (12.2928932188, -12.2928932188), (12, -13))
            Line((12, -13), (13, -13))
        make_face()
        with BuildLine():
            ThreePointArc((12, 13), (12.2928932188, 12.2928932188), (13, 12))
            Line((13, 12), (13, 13))
            Line((13, 13), (12, 13))
        make_face()
        with BuildLine():
            Line((13, 13), (13, 12))
            ThreePointArc((13, 12), (13.7071067812, 12.2928932188), (14, 13))
            ThreePointArc((14, 13), (13, 14), (12, 13))
            Line((12, 13), (13, 13))
        make_face()
    extrude(amount=-F9_DEPTH, mode=Mode.SUBTRACT)

    # F6 (on face) → F10 (join)
    with BuildSketch(Plane.XY.offset(2)):
        with BuildLine():
            Line((-12, 13), (-9.05, 13))
            ThreePointArc((-9.05, 13), (-15.7930717857, 15.7930717857), (-13, 9.05))
            Line((-13, 9.05), (-13, 12))
            ThreePointArc((-13, 12), (-13.7071067812, 13.7071067812), (-12, 13))
        make_face()
        with BuildLine():
            ThreePointArc((-13, 9.05), (-10.2069282143, 10.2069282143), (-9.05, 13))
            Line((-9.05, 13), (-12, 13))
            ThreePointArc((-12, 13), (-12.2928932188, 12.2928932188), (-13, 12))
            Line((-13, 12), (-13, 9.05))
        make_face()
        with BuildLine():
            ThreePointArc((-13, -9.05), (-15.7930717857, -15.7930717857), (-9.05, -13))
            Line((-9.05, -13), (-12, -13))
            ThreePointArc((-12, -13), (-13.7071067812, -13.7071067812), (-13, -12))
            Line((-13, -12), (-13, -9.05))
        make_face()
        with BuildLine():
            Line((-12, -13), (-9.05, -13))
            ThreePointArc((-9.05, -13), (-10.2069282143, -10.2069282143), (-13, -9.05))
            Line((-13, -9.05), (-13, -12))
            ThreePointArc((-13, -12), (-12.2928932188, -12.2928932188), (-12, -13))
        make_face()
        with BuildLine():
            ThreePointArc((16.95, -13), (15.7930717857, -10.2069282143), (13, -9.05))
            Line((13, -9.05), (13, -12))
            ThreePointArc((13, -12), (13.7071067812, -12.2928932188), (14, -13))
            ThreePointArc((14, -13), (13, -14), (12, -13))
            Line((12, -13), (9.05, -13))
            ThreePointArc((9.05, -13), (13, -16.95), (16.95, -13))
        make_face()
        with BuildLine():
            Line((13, -12), (13, -9.05))
            ThreePointArc((13, -9.05), (10.2069282143, -10.2069282143), (9.05, -13))
            Line((9.05, -13), (12, -13))
            ThreePointArc((12, -13), (12.2928932188, -12.2928932188), (13, -12))
        make_face()
        with BuildLine():
            Line((13, 12), (13, 9.05))
            ThreePointArc((13, 9.05), (15.7930717857, 10.2069282143), (16.95, 13))
            ThreePointArc((16.95, 13), (13, 16.95), (9.05, 13))
            Line((9.05, 13), (12, 13))
            ThreePointArc((12, 13), (13, 14), (14, 13))
            ThreePointArc((14, 13), (13.7071067812, 12.2928932188), (13, 12))
        make_face()
        with BuildLine():
            ThreePointArc((9.05, 13), (10.2069282143, 10.2069282143), (13, 9.05))
            Line((13, 9.05), (13, 12))
            ThreePointArc((13, 12), (12.2928932188, 12.2928932188), (12, 13))
            Line((12, 13), (9.05, 13))
        make_face()
    with SkipClean():  # cleaning this boolean's faces spoils the solid; the shape is the same uncleaned
        extrude(amount=F10_DEPTH)

    # F11 (on face) → F12 (join)
    with BuildSketch(Plane.XY.offset(0.5)):
        with Locations((-22, 0.2010576676)):
            Rectangle(F11_W, F11_H)
        with Locations((-0.2010576676, -22)):
            Rectangle(F11_W_2, F11_H_2)
        with Locations((22, -0.2010576676)):
            Rectangle(F11_W, F11_H)
        with Locations((0.2010576676, 22)):
            Rectangle(F11_W_2, F11_H_2)
    extrude(amount=F12_DEPTH)

    add(f1.part.fix(), mode=Mode.REPLACE)


solid = f1.part
